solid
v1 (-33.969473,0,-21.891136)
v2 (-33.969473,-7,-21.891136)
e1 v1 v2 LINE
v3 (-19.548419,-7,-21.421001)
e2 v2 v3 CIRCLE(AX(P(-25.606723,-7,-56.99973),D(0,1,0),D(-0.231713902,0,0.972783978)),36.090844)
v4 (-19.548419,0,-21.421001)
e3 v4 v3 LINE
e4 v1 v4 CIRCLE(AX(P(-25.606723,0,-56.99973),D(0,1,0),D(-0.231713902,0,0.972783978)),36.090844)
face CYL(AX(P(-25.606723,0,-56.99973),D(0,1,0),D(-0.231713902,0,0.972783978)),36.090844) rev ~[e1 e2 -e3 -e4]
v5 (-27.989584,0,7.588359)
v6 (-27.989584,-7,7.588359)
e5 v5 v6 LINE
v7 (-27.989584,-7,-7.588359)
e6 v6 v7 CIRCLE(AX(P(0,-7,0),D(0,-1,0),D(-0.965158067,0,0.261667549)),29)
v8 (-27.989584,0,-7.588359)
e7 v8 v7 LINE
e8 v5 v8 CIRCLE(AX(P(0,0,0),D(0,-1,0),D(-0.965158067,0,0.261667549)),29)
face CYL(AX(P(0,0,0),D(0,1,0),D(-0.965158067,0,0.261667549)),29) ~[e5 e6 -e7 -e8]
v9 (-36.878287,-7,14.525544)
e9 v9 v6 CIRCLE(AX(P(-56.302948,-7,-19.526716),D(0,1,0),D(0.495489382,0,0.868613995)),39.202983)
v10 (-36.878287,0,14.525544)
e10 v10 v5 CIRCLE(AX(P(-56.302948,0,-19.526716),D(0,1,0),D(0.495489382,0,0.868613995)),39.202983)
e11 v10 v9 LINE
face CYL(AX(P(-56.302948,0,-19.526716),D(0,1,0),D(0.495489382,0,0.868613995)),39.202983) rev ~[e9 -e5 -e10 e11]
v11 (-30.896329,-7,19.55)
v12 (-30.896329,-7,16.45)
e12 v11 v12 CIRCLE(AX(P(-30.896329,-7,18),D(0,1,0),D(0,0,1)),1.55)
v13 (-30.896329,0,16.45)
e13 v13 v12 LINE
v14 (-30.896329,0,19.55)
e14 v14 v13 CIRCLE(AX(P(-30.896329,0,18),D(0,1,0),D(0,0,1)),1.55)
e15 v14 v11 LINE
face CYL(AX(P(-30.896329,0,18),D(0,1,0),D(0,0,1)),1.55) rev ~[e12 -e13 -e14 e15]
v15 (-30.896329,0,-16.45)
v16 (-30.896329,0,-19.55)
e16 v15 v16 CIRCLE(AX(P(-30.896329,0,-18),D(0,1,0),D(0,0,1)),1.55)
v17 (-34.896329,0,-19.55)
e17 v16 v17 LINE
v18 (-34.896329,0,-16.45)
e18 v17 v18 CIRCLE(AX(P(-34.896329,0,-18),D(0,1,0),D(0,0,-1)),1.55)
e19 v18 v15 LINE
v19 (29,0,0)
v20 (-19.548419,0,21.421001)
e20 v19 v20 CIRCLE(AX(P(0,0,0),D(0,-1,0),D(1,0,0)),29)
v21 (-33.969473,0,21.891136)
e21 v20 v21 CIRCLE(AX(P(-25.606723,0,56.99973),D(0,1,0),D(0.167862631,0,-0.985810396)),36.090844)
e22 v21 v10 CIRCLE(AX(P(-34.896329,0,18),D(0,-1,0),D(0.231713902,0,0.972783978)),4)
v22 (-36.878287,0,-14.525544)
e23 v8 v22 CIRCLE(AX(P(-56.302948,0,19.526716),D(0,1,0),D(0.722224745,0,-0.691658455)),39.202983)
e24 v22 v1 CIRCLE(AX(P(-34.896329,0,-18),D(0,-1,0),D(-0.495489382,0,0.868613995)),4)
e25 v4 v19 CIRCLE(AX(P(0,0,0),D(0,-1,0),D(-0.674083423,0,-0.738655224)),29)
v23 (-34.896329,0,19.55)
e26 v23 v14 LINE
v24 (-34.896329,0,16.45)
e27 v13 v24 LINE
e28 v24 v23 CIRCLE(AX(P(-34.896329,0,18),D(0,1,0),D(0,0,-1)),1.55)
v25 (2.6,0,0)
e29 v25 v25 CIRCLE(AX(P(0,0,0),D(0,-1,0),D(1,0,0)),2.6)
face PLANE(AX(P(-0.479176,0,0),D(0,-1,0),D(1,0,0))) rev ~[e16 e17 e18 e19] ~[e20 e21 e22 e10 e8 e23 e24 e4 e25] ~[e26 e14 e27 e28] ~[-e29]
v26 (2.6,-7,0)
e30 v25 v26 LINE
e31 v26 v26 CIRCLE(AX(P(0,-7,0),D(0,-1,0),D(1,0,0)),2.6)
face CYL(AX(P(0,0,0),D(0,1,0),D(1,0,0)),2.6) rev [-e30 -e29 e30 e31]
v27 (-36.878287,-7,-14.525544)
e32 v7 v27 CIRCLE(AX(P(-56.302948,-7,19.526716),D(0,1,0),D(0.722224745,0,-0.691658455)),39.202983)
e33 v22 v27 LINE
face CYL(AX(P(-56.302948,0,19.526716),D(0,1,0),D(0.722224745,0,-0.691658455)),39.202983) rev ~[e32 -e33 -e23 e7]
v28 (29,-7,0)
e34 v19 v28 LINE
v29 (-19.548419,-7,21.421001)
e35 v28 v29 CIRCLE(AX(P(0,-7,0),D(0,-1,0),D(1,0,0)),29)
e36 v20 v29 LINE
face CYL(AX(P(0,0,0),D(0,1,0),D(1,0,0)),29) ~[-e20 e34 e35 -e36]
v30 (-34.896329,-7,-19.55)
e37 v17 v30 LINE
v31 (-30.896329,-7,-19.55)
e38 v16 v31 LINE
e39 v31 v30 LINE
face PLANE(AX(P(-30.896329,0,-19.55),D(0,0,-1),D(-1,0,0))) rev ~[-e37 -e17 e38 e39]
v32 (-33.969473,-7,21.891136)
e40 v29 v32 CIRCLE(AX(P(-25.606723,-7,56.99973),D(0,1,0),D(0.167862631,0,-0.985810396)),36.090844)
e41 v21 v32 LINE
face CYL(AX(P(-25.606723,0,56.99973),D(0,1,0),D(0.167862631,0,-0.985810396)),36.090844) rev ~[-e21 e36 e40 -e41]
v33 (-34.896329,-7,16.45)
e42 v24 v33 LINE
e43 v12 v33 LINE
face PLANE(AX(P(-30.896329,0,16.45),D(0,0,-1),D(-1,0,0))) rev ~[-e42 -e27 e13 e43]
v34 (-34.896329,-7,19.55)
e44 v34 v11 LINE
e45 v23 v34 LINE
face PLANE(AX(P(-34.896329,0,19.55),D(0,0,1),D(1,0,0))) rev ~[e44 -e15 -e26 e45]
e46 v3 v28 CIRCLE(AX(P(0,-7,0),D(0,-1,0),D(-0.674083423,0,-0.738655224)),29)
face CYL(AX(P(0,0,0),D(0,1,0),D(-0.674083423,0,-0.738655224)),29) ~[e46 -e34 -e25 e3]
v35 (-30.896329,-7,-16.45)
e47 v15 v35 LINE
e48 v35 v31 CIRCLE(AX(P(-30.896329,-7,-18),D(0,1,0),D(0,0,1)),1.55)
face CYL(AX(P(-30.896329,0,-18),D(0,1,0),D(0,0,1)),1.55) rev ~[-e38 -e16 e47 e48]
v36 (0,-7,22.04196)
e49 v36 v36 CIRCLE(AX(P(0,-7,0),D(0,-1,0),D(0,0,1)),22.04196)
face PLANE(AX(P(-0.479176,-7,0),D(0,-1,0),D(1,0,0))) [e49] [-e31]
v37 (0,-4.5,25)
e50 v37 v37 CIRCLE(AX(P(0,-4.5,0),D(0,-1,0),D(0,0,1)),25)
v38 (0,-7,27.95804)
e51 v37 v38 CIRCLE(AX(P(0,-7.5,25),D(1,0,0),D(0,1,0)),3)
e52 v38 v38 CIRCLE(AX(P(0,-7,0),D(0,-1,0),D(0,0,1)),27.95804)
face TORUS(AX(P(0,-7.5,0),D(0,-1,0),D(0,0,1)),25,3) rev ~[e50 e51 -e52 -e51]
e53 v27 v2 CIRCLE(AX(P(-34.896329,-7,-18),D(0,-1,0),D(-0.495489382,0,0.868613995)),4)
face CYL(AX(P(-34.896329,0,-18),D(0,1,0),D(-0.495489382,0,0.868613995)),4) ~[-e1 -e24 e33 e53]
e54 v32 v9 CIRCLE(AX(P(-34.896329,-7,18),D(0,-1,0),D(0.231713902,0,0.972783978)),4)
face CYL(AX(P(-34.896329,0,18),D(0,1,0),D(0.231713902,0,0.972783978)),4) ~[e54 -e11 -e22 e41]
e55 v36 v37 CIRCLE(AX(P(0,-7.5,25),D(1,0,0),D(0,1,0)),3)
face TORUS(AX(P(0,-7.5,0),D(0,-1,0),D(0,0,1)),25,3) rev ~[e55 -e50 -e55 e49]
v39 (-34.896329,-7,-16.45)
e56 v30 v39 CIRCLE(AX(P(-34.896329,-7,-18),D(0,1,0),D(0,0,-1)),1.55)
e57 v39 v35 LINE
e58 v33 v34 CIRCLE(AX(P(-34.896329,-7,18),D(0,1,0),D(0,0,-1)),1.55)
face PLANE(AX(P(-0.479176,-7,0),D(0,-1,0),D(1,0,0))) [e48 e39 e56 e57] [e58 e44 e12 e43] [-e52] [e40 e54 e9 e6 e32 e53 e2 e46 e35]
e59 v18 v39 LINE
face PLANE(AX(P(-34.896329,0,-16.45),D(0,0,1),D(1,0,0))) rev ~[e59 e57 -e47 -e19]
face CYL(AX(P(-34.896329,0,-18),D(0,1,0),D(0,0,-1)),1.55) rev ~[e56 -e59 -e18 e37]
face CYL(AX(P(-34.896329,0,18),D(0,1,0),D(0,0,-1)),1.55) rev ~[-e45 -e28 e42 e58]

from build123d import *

# Parameters (mm, degrees)
F0_R     = 2.6
F1_DEPTH = 7
F2_R     = 3


# Not quite as in the source:
# - a feature names something its author has since deleted; it is built from what else it names


with BuildPart() as f1:
    # F0 (on Front) → F1 (new body)
    with BuildSketch(Plane.XZ):
        with BuildLine():
            ThreePointArc((-19.5484192549, -21.4210014853), (11.706746807, -26.5320952659), (29, 0))
            ThreePointArc((29, 0), (11.706746807, 26.5320952659), (-19.5484192549, 21.4210014853))
            ThreePointArc((-19.5484192549, 21.4210014853), (-24.7548164348, 15.1062590762), (-27.9895839317, 7.5883589353))
            ThreePointArc((-27.9895839317, 7.5883589353), (-29, 0), (-27.9895839317, -7.5883589353))
            ThreePointArc((-27.9895839317, -7.5883589353), (-24.7548164348, -15.1062590762), (-19.5484192549, -21.4210014853))
        make_face()
        Circle(F0_R, mode=Mode.SUBTRACT)
        with BuildLine():
            ThreePointArc((-27.9895839317, 7.5883589353), (-24.7548164348, 15.1062590762), (-19.5484192549, 21.4210014853))
            ThreePointArc((-19.5484192549, 21.4210014853), (-26.7826801614, 20.9280500488), (-33.9694734381, 21.8911359117))
            ThreePointArc((-33.9694734381, 21.8911359117), (-38.616718272, 19.4692528721), (-36.8782865714, 14.5255440189))
            ThreePointArc((-36.8782865714, 14.5255440189), (-32.1832277785, 11.3781861206), (-27.9895839317, 7.5883589353))
        make_face()
        with BuildLine():
            ThreePointArc((-34.8963290453, 16.45), (-36.4463290453, 18), (-34.8963290453, 19.55))
            Line((-34.8963290453, 19.55), (-30.8963290453, 19.55))
            ThreePointArc((-30.8963290453, 19.55), (-29.3463290453, 18), (-30.8963290453, 16.45))
            Line((-30.8963290453, 16.45), (-34.8963290453, 16.45))
        make_face(mode=Mode.SUBTRACT)
        with BuildLine():
            ThreePointArc((-33.9694734381, -21.8911359117), (-26.7826801614, -20.9280500488), (-19.5484192549, -21.4210014853))
            ThreePointArc((-19.5484192549, -21.4210014853), (-24.7548164348, -15.1062590762), (-27.9895839317, -7.5883589353))
            ThreePointArc((-27.9895839317, -7.5883589353), (-32.1832277785, -11.3781861206), (-36.8782865714, -14.5255440189))
            ThreePointArc((-36.8782865714, -14.5255440189), (-38.616718272, -19.4692528721), (-33.9694734381, -21.8911359117))
        make_face()
        with BuildLine():
            Line((-34.8963290453, -16.45), (-30.8963290453, -16.45))
            ThreePointArc((-30.8963290453, -16.45), (-29.3463290453, -18), (-30.8963290453, -19.55))
            Line((-30.8963290453, -19.55), (-34.8963290453, -19.55))
            ThreePointArc((-34.8963290453, -19.55), (-36.4463290453, -18), (-34.8963290453, -16.45))
        make_face(mode=Mode.SUBTRACT)
    extrude(amount=F1_DEPTH)

    # F2 (on Right) → F3 (revolve, cut)
    with BuildSketch(Plane.YZ):
        with Locations((-7.5, 25)):
            Circle(F2_R)
    revolve(axis=Axis((0, 0, 0), (0, -1, 0)), mode=Mode.SUBTRACT)


solid = f1.part
